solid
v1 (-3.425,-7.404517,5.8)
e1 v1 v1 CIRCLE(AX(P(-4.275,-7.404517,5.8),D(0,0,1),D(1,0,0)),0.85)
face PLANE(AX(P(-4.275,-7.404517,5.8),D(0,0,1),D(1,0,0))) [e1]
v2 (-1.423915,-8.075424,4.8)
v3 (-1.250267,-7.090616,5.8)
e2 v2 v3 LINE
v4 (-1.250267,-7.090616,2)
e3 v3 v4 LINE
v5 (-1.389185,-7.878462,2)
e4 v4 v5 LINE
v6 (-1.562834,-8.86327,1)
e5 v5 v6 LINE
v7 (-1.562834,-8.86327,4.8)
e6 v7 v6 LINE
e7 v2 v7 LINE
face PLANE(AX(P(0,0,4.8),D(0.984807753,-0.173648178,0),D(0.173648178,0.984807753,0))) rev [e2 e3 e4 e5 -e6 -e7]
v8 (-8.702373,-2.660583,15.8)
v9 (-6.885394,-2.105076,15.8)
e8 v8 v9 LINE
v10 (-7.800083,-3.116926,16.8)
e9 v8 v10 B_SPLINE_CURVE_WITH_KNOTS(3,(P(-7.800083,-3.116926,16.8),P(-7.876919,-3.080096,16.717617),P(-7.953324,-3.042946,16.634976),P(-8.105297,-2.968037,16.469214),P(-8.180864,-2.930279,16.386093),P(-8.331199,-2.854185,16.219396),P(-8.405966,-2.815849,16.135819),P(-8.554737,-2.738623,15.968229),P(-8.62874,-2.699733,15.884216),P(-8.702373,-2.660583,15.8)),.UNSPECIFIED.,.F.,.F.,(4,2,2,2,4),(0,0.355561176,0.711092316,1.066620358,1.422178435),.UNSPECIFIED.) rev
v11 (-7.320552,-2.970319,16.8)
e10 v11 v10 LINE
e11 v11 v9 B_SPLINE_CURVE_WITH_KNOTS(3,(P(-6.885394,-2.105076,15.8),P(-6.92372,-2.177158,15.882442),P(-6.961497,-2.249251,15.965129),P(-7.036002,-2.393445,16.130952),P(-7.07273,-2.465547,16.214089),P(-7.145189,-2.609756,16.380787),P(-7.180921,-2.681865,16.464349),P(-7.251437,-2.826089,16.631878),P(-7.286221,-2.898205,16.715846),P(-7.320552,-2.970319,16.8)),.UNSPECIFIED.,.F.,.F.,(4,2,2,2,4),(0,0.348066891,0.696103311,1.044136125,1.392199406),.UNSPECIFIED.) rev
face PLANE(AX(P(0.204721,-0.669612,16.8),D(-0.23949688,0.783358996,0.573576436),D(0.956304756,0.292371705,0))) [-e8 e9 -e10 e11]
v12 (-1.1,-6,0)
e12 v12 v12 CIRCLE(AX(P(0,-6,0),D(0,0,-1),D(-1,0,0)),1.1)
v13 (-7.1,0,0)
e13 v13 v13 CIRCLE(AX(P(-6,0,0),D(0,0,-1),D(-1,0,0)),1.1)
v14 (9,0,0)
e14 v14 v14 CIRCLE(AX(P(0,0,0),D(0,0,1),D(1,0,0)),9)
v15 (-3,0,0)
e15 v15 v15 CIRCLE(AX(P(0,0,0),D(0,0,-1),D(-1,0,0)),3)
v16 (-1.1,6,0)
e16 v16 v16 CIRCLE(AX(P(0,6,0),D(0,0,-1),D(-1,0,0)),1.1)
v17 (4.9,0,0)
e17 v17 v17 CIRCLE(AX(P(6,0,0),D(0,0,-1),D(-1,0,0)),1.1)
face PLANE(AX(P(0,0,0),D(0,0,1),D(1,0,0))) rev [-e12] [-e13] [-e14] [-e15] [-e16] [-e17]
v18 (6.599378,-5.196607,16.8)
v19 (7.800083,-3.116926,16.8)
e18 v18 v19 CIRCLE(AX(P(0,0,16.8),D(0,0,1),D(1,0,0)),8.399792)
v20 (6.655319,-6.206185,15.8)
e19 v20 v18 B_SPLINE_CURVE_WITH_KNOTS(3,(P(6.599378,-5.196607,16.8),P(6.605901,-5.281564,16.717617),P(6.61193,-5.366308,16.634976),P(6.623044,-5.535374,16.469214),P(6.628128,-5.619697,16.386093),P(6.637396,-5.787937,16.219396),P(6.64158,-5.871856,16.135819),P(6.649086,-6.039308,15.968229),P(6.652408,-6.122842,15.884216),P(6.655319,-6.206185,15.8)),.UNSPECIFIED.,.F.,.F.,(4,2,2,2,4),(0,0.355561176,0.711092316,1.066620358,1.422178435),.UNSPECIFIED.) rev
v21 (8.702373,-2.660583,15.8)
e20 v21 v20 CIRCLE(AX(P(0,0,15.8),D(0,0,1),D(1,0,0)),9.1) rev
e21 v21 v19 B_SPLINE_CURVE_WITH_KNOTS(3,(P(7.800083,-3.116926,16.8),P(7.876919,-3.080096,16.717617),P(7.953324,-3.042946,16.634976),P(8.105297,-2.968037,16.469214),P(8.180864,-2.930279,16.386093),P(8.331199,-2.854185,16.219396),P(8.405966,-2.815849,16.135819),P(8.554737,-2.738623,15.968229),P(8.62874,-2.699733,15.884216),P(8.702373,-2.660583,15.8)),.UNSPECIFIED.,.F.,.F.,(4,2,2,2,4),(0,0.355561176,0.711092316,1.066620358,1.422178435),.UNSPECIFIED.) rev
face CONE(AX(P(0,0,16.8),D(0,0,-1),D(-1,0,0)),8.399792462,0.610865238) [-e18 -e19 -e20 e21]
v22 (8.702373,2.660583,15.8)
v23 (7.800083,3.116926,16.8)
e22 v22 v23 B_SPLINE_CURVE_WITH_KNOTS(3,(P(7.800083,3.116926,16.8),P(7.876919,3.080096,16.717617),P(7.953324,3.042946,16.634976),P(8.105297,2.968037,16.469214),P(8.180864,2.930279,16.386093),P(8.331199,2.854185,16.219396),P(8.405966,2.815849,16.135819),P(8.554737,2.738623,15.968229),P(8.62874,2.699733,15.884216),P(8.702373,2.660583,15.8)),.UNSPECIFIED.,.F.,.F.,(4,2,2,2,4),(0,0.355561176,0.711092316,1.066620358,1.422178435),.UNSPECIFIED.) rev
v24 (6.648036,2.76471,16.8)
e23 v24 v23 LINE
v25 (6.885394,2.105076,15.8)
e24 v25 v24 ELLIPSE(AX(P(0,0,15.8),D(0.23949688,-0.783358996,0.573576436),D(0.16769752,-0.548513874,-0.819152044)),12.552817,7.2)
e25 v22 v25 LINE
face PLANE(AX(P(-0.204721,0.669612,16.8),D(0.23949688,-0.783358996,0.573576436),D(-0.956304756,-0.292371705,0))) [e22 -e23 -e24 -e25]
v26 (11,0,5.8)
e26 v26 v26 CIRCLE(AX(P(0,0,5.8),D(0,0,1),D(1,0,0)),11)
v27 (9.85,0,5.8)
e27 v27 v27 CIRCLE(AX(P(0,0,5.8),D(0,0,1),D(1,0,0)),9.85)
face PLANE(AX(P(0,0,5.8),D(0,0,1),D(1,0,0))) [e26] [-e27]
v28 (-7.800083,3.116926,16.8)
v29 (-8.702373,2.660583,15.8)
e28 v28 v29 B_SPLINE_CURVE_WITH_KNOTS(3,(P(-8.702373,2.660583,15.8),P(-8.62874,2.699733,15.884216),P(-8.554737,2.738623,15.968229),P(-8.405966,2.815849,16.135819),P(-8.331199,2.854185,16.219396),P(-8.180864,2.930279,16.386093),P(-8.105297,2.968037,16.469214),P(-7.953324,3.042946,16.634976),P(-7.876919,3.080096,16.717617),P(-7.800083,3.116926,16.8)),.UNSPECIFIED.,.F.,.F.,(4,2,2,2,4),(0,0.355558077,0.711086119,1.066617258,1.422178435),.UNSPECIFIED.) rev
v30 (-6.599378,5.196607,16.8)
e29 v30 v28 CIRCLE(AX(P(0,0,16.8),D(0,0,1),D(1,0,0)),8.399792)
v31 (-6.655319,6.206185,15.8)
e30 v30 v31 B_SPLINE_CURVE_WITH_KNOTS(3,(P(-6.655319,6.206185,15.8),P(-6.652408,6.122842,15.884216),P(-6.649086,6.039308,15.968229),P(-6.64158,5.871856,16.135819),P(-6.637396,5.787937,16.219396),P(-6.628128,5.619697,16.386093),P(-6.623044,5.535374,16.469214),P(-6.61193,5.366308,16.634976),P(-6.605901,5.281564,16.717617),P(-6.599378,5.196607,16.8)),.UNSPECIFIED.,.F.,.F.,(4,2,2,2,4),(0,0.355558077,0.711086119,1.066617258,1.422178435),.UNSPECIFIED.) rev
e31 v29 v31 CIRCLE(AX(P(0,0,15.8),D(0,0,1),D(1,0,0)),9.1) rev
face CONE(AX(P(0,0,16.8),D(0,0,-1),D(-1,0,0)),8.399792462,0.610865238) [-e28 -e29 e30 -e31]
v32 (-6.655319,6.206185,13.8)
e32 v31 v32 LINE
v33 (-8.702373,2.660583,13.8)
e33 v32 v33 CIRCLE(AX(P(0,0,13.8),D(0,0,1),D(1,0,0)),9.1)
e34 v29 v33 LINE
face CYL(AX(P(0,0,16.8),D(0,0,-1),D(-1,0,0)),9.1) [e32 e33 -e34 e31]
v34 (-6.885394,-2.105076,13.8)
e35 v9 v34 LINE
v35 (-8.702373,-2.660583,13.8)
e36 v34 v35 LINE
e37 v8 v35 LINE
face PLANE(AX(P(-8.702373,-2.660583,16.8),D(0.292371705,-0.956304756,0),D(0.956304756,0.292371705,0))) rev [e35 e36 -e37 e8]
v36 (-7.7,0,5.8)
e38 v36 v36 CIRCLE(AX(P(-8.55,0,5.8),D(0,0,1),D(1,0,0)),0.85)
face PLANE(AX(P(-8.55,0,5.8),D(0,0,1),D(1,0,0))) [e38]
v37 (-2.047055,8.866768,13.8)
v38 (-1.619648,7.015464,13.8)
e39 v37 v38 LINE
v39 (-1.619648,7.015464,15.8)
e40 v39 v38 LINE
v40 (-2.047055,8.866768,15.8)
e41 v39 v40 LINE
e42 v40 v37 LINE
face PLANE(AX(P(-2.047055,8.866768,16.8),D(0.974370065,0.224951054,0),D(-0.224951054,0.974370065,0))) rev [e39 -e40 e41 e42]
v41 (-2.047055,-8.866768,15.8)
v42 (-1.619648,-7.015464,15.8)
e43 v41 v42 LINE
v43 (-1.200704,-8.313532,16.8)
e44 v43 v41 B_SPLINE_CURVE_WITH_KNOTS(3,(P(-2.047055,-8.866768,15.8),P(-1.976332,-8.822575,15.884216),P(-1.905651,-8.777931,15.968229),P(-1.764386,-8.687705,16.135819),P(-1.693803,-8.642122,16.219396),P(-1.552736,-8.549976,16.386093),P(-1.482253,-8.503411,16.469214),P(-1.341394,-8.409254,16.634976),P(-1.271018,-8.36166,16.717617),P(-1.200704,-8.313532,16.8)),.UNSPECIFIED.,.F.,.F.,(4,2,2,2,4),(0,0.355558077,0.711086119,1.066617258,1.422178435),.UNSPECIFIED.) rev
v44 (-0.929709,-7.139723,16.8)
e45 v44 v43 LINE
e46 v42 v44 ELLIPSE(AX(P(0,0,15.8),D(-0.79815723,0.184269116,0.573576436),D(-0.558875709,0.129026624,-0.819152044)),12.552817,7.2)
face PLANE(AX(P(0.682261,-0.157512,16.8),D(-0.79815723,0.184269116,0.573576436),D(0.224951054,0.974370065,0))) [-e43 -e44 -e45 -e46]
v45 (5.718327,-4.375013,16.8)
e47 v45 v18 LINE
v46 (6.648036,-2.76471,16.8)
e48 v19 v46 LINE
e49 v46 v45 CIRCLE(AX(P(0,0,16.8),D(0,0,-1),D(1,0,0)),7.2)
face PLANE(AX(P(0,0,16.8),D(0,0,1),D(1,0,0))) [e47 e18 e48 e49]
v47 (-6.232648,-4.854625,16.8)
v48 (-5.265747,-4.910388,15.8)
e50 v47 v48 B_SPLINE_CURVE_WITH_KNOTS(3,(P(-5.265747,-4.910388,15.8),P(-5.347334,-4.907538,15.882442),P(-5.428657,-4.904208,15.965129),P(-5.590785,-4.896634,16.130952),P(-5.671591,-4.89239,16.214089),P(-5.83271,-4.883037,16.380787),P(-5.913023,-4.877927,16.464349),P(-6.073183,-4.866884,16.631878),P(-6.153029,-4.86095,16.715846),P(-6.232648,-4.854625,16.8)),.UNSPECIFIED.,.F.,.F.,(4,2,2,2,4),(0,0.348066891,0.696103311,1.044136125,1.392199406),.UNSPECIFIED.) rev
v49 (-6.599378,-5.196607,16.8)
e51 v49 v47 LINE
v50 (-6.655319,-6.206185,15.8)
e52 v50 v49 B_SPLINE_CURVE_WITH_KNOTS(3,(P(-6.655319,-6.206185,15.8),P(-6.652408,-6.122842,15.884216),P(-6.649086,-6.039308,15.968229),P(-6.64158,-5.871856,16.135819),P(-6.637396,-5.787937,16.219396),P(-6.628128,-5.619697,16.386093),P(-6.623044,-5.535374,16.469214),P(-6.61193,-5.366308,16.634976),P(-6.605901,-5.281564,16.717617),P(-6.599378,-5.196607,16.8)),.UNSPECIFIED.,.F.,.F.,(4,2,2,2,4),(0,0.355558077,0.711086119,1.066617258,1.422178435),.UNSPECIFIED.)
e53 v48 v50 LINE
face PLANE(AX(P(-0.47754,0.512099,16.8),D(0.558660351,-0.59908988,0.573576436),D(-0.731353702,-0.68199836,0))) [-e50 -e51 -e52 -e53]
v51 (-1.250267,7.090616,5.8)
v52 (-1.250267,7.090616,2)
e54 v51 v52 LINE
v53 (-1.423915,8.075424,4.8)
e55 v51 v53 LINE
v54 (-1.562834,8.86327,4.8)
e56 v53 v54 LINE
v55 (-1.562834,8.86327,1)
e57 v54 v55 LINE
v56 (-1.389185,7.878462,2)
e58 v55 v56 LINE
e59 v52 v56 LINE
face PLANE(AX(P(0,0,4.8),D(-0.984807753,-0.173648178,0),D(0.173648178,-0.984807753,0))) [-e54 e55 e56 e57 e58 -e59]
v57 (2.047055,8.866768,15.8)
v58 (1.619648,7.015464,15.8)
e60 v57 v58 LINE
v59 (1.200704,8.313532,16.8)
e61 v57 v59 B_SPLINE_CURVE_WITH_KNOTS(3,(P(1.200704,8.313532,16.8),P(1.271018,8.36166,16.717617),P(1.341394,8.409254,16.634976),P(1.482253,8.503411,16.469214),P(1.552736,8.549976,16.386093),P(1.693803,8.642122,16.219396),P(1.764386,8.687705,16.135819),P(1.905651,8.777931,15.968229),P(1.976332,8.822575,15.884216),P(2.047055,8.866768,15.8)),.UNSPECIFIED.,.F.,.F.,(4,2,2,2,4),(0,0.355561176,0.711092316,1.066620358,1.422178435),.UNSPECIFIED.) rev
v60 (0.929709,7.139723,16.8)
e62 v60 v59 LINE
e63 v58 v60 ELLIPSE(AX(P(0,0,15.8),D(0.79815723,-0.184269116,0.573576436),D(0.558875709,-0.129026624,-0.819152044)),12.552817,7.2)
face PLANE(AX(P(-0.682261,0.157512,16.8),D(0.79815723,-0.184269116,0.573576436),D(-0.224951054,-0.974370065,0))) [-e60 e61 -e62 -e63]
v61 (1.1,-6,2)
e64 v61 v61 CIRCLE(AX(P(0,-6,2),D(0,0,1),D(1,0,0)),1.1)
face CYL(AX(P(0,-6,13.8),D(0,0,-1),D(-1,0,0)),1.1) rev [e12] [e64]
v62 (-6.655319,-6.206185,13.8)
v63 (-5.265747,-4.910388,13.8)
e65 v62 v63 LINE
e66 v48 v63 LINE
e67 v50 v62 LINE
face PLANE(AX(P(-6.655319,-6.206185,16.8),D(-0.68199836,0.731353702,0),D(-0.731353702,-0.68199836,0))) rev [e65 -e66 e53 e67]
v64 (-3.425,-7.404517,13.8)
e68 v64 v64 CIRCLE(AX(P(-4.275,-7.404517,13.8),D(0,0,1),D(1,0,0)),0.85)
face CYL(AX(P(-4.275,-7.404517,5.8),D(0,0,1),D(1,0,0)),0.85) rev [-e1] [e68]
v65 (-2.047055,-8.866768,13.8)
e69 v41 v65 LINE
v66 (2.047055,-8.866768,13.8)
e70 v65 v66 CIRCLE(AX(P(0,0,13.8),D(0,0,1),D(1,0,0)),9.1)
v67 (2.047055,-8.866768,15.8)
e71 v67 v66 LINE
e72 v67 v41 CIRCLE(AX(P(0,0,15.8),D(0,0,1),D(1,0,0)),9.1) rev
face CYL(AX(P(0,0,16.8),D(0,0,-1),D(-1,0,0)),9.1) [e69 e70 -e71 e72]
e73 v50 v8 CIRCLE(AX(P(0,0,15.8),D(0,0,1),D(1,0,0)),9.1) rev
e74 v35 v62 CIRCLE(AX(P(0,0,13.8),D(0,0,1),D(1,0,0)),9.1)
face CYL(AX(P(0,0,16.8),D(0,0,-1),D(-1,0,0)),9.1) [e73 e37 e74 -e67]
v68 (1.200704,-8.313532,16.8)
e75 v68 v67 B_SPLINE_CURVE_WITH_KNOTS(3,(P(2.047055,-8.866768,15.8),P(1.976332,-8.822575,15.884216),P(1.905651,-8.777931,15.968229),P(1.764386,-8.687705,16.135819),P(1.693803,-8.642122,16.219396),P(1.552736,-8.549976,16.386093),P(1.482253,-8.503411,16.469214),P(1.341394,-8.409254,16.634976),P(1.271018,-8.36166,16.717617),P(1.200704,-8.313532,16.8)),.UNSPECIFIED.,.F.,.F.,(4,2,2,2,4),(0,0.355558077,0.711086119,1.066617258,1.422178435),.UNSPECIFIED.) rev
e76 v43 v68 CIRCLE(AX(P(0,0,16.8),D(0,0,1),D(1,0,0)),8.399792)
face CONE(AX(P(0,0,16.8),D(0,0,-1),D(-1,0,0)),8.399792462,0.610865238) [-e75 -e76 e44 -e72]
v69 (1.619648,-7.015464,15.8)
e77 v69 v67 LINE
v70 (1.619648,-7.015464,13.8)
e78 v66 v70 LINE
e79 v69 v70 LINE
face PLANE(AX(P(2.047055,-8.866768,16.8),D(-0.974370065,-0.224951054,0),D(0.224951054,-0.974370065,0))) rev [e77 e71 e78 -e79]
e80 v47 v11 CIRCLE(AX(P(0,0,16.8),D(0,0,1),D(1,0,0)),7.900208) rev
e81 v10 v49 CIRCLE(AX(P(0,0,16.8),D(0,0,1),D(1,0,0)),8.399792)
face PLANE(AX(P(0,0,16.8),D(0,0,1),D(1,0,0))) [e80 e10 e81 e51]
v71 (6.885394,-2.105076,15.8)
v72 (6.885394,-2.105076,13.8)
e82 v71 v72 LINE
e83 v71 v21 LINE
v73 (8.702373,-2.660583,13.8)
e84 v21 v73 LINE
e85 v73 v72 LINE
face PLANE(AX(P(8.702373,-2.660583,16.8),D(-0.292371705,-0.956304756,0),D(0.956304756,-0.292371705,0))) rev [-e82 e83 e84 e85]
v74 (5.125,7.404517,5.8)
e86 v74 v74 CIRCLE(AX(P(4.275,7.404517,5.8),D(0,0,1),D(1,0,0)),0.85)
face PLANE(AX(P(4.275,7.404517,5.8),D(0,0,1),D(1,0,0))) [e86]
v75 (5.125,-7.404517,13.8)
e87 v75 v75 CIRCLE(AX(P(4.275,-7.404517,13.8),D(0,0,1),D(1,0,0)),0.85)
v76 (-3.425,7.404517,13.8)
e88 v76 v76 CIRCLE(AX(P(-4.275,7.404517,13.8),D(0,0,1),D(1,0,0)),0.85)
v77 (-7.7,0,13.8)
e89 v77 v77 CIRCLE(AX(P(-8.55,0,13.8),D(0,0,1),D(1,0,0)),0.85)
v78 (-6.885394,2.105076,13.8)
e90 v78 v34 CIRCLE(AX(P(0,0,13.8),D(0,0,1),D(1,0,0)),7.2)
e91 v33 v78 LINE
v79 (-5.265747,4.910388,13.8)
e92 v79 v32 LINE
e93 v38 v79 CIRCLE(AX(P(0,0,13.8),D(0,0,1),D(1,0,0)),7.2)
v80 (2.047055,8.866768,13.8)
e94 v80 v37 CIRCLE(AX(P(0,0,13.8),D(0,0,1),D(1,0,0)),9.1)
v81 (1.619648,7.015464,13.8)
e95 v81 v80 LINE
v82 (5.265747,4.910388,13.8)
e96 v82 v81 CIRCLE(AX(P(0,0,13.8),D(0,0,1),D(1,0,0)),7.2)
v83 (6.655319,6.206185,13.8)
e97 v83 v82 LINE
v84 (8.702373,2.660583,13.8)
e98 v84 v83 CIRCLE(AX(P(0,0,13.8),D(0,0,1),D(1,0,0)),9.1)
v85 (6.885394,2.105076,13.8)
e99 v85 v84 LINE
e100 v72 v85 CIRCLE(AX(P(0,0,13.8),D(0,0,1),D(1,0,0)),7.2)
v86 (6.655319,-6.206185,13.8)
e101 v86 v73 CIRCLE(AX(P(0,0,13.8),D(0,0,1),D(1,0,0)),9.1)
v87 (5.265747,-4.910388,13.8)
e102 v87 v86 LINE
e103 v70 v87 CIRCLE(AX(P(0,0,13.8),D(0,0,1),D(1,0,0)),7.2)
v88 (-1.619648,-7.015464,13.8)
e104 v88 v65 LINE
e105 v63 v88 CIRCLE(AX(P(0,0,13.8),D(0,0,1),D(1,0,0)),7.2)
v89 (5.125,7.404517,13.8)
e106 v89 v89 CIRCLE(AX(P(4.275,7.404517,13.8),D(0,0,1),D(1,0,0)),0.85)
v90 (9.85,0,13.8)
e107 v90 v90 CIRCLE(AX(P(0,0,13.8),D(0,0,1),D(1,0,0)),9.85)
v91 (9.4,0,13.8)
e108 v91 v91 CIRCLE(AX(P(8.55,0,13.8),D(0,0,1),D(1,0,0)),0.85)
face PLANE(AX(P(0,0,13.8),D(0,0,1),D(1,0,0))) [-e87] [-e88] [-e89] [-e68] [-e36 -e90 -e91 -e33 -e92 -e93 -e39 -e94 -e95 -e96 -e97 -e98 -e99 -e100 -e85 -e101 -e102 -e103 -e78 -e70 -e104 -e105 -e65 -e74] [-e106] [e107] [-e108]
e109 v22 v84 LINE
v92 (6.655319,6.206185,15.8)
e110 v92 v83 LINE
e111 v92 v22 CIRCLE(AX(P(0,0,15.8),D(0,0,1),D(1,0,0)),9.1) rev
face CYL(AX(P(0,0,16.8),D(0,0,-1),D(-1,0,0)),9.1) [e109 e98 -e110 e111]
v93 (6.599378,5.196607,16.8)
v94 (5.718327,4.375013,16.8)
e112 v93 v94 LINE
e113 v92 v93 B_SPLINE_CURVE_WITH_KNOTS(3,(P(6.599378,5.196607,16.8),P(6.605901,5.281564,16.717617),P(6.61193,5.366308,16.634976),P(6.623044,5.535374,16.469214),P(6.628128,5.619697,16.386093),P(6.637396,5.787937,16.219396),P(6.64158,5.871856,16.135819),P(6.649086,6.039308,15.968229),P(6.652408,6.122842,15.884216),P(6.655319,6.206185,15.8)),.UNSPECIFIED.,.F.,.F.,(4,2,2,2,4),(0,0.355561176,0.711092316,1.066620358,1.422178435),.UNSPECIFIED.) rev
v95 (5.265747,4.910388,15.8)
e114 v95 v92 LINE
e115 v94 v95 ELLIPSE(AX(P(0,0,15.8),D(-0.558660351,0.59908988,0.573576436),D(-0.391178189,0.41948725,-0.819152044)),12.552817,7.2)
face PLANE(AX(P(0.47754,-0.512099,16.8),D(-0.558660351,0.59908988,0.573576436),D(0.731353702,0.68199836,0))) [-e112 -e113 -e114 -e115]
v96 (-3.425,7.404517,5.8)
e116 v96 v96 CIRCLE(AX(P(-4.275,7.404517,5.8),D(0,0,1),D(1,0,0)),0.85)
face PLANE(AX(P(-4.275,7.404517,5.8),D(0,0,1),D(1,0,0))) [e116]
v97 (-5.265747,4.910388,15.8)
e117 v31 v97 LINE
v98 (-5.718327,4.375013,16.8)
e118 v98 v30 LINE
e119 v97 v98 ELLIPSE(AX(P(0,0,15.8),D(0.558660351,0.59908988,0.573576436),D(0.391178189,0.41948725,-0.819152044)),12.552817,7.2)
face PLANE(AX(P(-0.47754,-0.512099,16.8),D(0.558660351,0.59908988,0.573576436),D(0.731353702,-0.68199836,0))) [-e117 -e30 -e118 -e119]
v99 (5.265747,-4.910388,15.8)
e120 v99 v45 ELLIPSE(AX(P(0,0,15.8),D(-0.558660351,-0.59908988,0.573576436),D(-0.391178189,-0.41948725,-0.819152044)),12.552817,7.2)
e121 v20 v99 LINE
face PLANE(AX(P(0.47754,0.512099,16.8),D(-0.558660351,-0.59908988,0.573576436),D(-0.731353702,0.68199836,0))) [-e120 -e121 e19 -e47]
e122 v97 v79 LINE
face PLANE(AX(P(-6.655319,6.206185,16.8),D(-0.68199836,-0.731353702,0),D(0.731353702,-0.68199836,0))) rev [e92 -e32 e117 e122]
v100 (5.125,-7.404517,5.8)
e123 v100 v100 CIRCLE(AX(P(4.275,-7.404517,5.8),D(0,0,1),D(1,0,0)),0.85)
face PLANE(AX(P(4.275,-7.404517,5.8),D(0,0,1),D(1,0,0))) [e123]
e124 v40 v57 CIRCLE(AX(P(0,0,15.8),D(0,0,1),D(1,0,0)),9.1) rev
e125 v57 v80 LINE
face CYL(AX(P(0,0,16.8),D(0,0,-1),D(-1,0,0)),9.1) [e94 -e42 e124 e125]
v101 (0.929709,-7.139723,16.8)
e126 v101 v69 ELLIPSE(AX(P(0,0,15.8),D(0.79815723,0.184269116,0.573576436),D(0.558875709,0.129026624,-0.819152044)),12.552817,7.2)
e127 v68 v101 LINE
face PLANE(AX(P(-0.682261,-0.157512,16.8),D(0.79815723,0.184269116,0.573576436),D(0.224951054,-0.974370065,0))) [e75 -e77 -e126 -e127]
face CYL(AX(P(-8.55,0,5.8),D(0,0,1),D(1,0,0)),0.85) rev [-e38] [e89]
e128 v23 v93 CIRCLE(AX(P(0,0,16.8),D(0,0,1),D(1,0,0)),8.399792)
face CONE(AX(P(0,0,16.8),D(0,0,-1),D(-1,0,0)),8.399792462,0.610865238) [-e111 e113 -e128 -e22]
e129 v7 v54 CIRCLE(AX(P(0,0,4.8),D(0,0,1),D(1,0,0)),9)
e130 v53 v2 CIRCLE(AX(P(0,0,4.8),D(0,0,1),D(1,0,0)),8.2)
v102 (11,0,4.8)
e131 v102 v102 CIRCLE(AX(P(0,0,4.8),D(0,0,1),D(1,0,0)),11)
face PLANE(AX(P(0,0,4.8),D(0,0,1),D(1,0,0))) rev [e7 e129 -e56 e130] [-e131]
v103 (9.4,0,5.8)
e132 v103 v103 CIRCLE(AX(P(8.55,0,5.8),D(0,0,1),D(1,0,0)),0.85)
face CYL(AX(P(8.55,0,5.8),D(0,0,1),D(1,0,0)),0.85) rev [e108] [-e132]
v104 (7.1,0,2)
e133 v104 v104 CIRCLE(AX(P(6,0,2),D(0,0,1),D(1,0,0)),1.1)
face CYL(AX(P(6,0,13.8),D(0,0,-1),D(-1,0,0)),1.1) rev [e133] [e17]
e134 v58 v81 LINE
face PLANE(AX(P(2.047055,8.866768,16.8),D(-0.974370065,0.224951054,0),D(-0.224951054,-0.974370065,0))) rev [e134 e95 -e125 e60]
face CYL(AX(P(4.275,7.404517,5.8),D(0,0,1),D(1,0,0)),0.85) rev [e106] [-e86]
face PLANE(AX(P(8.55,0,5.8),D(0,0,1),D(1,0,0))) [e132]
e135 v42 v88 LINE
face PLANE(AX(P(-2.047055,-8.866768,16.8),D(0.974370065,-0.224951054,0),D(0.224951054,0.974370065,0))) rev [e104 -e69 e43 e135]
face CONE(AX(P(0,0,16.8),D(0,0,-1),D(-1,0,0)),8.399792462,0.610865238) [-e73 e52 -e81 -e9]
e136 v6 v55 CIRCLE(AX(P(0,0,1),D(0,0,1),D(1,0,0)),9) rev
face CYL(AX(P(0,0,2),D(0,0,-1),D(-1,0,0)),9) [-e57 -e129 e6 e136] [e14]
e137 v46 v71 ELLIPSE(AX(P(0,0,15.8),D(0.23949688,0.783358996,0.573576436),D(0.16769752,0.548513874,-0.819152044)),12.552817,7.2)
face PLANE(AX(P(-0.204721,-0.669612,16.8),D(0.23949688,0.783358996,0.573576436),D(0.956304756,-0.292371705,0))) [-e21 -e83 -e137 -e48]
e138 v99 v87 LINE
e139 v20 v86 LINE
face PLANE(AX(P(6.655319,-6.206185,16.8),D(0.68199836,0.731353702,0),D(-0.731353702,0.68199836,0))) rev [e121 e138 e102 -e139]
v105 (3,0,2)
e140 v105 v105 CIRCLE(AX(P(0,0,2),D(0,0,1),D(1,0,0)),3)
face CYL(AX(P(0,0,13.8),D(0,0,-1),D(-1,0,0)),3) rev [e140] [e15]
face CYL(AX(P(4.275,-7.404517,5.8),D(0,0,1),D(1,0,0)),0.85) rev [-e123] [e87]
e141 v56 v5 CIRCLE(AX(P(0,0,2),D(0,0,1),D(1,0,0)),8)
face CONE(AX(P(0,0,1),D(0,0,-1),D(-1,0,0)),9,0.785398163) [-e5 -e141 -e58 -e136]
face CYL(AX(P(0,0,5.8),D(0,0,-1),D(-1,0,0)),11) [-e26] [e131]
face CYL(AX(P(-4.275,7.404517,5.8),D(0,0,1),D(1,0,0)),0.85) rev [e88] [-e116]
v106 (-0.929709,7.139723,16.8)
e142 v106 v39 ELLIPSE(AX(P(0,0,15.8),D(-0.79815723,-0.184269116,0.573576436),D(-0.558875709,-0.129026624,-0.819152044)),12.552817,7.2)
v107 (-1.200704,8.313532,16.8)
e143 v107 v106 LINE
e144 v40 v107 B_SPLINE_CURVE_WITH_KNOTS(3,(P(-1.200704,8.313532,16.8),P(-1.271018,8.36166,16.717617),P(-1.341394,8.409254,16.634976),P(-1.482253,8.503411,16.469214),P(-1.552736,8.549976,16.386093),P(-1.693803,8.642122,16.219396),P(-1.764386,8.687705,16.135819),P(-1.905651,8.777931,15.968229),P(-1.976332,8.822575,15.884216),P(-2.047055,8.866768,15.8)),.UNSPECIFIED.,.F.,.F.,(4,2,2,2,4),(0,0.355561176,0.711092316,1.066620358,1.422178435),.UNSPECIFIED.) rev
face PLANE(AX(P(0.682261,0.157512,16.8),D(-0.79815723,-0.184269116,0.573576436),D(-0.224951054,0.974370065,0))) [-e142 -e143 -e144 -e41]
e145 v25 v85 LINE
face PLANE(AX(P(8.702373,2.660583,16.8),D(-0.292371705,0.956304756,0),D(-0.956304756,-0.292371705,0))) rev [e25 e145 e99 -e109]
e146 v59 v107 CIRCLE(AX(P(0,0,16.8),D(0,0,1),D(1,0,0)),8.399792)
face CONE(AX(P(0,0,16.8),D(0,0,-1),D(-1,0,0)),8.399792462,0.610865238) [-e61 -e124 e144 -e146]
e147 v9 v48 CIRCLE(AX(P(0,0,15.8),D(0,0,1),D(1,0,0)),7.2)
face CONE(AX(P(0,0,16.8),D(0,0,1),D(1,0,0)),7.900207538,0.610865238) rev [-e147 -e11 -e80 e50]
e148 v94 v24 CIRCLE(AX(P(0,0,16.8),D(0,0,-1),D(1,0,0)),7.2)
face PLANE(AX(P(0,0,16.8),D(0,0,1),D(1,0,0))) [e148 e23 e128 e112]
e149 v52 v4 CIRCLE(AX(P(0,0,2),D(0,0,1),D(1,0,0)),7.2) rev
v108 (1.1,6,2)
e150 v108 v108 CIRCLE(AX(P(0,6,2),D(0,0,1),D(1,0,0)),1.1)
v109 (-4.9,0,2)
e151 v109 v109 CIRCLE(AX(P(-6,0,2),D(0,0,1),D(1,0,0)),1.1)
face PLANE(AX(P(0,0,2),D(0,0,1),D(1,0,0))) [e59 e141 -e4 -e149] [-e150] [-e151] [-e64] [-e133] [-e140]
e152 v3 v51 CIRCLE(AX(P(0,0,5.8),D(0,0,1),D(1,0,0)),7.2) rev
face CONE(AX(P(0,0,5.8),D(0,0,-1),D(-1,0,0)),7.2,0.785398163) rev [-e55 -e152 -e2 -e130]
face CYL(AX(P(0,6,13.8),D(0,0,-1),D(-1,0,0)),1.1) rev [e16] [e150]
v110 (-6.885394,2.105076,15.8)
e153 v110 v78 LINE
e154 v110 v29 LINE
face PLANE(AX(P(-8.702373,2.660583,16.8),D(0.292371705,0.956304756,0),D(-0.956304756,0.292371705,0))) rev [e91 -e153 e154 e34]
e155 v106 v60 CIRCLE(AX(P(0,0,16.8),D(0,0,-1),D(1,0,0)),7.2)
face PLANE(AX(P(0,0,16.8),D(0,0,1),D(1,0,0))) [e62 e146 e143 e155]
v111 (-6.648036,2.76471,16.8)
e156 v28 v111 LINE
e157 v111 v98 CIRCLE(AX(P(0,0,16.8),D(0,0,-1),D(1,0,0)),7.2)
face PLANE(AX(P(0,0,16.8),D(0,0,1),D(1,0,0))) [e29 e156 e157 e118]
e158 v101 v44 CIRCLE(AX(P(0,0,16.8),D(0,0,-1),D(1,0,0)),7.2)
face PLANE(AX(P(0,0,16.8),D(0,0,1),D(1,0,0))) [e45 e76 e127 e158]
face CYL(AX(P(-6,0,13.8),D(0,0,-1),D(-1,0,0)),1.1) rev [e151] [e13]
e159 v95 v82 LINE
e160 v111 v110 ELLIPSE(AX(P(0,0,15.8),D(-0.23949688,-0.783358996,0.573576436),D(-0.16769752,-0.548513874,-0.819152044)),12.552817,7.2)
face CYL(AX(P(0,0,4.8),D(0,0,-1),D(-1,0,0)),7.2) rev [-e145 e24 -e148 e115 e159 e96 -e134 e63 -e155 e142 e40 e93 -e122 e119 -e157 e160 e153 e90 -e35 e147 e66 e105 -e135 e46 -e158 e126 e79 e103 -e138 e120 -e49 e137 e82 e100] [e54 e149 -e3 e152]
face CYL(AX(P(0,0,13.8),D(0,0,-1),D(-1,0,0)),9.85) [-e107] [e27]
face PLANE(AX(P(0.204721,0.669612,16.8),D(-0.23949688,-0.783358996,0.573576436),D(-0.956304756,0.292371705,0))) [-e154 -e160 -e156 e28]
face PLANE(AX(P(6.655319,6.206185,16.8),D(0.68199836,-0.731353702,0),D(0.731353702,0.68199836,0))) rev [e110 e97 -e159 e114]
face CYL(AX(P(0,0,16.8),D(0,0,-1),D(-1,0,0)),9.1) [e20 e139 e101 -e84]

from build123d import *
from OCP.BRepFilletAPI import BRepFilletAPI_MakeChamfer
from build123d.topology import SkipClean

# Parameters (mm, degrees)
SKETCH_1_R          = 9
EXTRUDE_1_DEPTH     = 2
SKETCH_2_R          = 9
SKETCH_2_R_2        = 7.2
EXTRUDE_2_DEPTH     = 2.8
SKETCH_4_R          = 11
SKETCH_4_R_2        = 7.2
EXTRUDE_3_DEPTH     = 1
SKETCH_5_R          = 9.85
SKETCH_5_R_2        = 7.2
EXTRUDE_4_DEPTH     = 8
SKETCH_6_R          = 0.85
CUT_EXTRUDE_1_DEPTH = 8
SKETCH_7_R          = 3
SKETCH_7_R_2        = 1.1
CUT_EXTRUDE_2_DEPTH = 21.795191752
EXTRUDE_5_DEPTH     = 3
CHAMFER_1_SIZE      = 1
CHAMFER_1_SIZE2     = 0.700207538
CUT_EXTRUDE_START   = -2
SKETCH_11_R         = 1.1
CUT_EXTRUDE_3_DEPTH = 2.8
CHAMFER_2_SIZE      = 1


with BuildPart() as part:
    # 스케치1 → 보스-돌출1 (new body)
    with BuildSketch(Plane.XY):
        Circle(SKETCH_1_R)
    extrude(amount=EXTRUDE_1_DEPTH)

    # 스케치2 → 보스-돌출2 (add)
    with BuildSketch(Plane.XY.offset(2)):
        Circle(SKETCH_2_R)
        Circle(SKETCH_2_R_2, mode=Mode.SUBTRACT)
    extrude(amount=EXTRUDE_2_DEPTH)

    # 스케치4 → 보스-돌출3 (add)
    with BuildSketch(Plane.XY.offset(4.8)):
        Circle(SKETCH_4_R)
        Circle(SKETCH_4_R_2, mode=Mode.SUBTRACT)
    extrude(amount=EXTRUDE_3_DEPTH)

    # 스케치5 → 보스-돌출4 (add)
    with BuildSketch(Plane.XY.offset(5.8)):
        Circle(SKETCH_5_R)
        Circle(SKETCH_5_R_2, mode=Mode.SUBTRACT)
    extrude(amount=EXTRUDE_4_DEPTH)

    # 스케치6 → 컷-돌출1 (cut)
    with BuildSketch(Plane.XY.offset(13.8)):
        with Locations((8.55, 0)):
            Circle(SKETCH_6_R)
        with Locations((4.275, -7.404517202)):
            Circle(SKETCH_6_R)
        with Locations((-4.275, -7.404517202)):
            Circle(SKETCH_6_R)
        with Locations((-8.55, 0)):
            Circle(SKETCH_6_R)
        with Locations((-4.275, 7.404517202)):
            Circle(SKETCH_6_R)
        with Locations((4.275, 7.404517202)):
            Circle(SKETCH_6_R)
    extrude(amount=-CUT_EXTRUDE_1_DEPTH, mode=Mode.SUBTRACT)

    # 스케치7 → 컷-돌출2 (cut, through all)
    with BuildSketch(Plane(origin=(0, 0, 0), x_dir=(-1, 0, 0), z_dir=(0, 0, -1))):
        Circle(SKETCH_7_R)
        with Locations((-6, 0)):
            Circle(SKETCH_7_R_2)
        with Locations((6, 0)):
            Circle(SKETCH_7_R_2)
        with Locations((0, 6)):
            Circle(SKETCH_7_R_2)
        with Locations((0, -6)):
            Circle(SKETCH_7_R_2)
    extrude(amount=-CUT_EXTRUDE_2_DEPTH, mode=Mode.SUBTRACT)

    # 스케치10 → 보스-돌출5 (add)
    with SkipClean():  # the faces are left unmerged after this step: merging them gives an invalid solid
        with BuildSketch(Plane.XY.offset(13.8)):
            with BuildLine():
                Line((2.047054595, 8.86676759), (1.619647591, 7.015464466))
                ThreePointArc((1.619647591, 7.015464466), (0, 7.2), (-1.619647591, 7.015464466))
                Line((-1.619647591, 7.015464466), (-2.047054595, 8.86676759))
                ThreePointArc((-2.047054595, 8.86676759), (0, 9.1), (2.047054595, 8.86676759))
            make_face()
            with BuildLine():
                Line((6.655318685, 6.206185077), (5.265746652, 4.910388192))
                ThreePointArc((5.265746652, 4.910388192), (6.235382907, 3.6), (6.885394243, 2.105076274))
                Line((6.885394243, 2.105076274), (8.702373279, 2.660582513))
                ThreePointArc((8.702373279, 2.660582513), (7.880831174, 4.55), (6.655318685, 6.206185077))
            make_face()
            with BuildLine():
                Line((8.702373279, -2.660582513), (6.885394243, -2.105076274))
                ThreePointArc((6.885394243, -2.105076274), (6.235382907, -3.6), (5.265746652, -4.910388192))
                Line((5.265746652, -4.910388192), (6.655318685, -6.206185077))
                ThreePointArc((6.655318685, -6.206185077), (7.880831174, -4.55), (8.702373279, -2.660582513))
            make_face()
            with BuildLine():
                Line((2.047054595, -8.86676759), (1.619647591, -7.015464466))
                ThreePointArc((1.619647591, -7.015464466), (0, -7.2), (-1.619647591, -7.015464466))
                Line((-1.619647591, -7.015464466), (-2.047054595, -8.86676759))
                ThreePointArc((-2.047054595, -8.86676759), (0, -9.1), (2.047054595, -8.86676759))
            make_face()
            with BuildLine():
                Line((-6.655318685, -6.206185077), (-5.265746652, -4.910388192))
                ThreePointArc((-5.265746652, -4.910388192), (-6.235382907, -3.6), (-6.885394243, -2.105076274))
                Line((-6.885394243, -2.105076274), (-8.702373279, -2.660582513))
                ThreePointArc((-8.702373279, -2.660582513), (-7.880831174, -4.55), (-6.655318685, -6.206185077))
            make_face()
            with BuildLine():
                Line((-8.702373279, 2.660582513), (-6.885394243, 2.105076274))
                ThreePointArc((-6.885394243, 2.105076274), (-6.235382907, 3.6), (-5.265746652, 4.910388192))
                Line((-5.265746652, 4.910388192), (-6.655318685, 6.206185077))
                ThreePointArc((-6.655318685, 6.206185077), (-7.880831174, 4.55), (-8.702373279, 2.660582513))
            make_face()
        extrude(amount=EXTRUDE_5_DEPTH)

    # 모따기1: one chamfer whose edges measure the first distance from different faces: ONE call of the kernel's chamfer builder (chamfer() names one face for all edges)
    chamfer_1_edges_1 = [part.edges().sort_by_distance(p)[0] for p in [
        (-7.880831174, -4.55, 16.8),
    ]]
    chamfer_1_side_1 = [part.faces().sort_by_distance(p)[0] for p in [
        (-7.880831174, -4.55, 15.3),
    ]]
    chamfer_1_edges_2 = [part.edges().sort_by_distance(p)[0] for p in [
        (0, -9.1, 16.8),
    ]]
    chamfer_1_side_2 = [part.faces().sort_by_distance(p)[0] for p in [
        (0, -9.1, 15.3),
    ]]
    chamfer_1_edges_3 = [part.edges().sort_by_distance(p)[0] for p in [
        (7.880831174, -4.55, 16.8),
    ]]
    chamfer_1_side_3 = [part.faces().sort_by_distance(p)[0] for p in [
        (7.880831174, -4.55, 15.3),
    ]]
    chamfer_1_edges_4 = [part.edges().sort_by_distance(p)[0] for p in [
        (7.880831174, 4.55, 16.8),
    ]]
    chamfer_1_side_4 = [part.faces().sort_by_distance(p)[0] for p in [
        (7.880831174, 4.55, 15.3),
    ]]
    chamfer_1_edges_5 = [part.edges().sort_by_distance(p)[0] for p in [
        (0, 9.1, 16.8),
    ]]
    chamfer_1_side_5 = [part.faces().sort_by_distance(p)[0] for p in [
        (0, 9.1, 15.3),
    ]]
    chamfer_1_edges_6 = [part.edges().sort_by_distance(p)[0] for p in [
        (-7.880831174, 4.55, 16.8),
    ]]
    chamfer_1_side_6 = [part.faces().sort_by_distance(p)[0] for p in [
        (-7.880831174, 4.55, 15.3),
    ]]
    chamfer_1_edges_7 = [part.edges().sort_by_distance(p)[0] for p in [
        (-7.793883761, -2.382829393, 16.8),
    ]]
    chamfer_1_side_7 = [part.faces().sort_by_distance(p)[0] for p in [
        (-7.793883761, -2.382829393, 15.3),
    ]]
    chamfer_1_edges_8 = [part.edges().sort_by_distance(p)[0] for p in [
        (-6.235382907, -3.6, 16.8),
    ]]
    chamfer_1_side_8 = [part.faces().sort_by_distance(p)[0] for p in [
        (-6.235382907, -3.6, 15.3),
    ]]
    chamfer_1_edges_9 = [part.edges().sort_by_distance(p)[0] for p in [
        (-5.960532668, -5.558286635, 16.8),
    ]]
    chamfer_1_side_9 = [part.faces().sort_by_distance(p)[0] for p in [
        (-5.960532668, -5.558286635, 15.3),
    ]]
    chamfer_1_edges_10 = [part.edges().sort_by_distance(p)[0] for p in [
        (1.833351093, -7.941116028, 16.8),
    ]]
    chamfer_1_side_10 = [part.faces().sort_by_distance(p)[0] for p in [
        (1.833351093, -7.941116028, 15.3),
    ]]
    chamfer_1_edges_11 = [part.edges().sort_by_distance(p)[0] for p in [
        (-1.833351093, -7.941116028, 16.8),
    ]]
    chamfer_1_side_11 = [part.faces().sort_by_distance(p)[0] for p in [
        (-1.833351093, -7.941116028, 15.3),
    ]]
    chamfer_1_edges_12 = [part.edges().sort_by_distance(p)[0] for p in [
        (5.960532668, -5.558286635, 16.8),
    ]]
    chamfer_1_side_12 = [part.faces().sort_by_distance(p)[0] for p in [
        (5.960532668, -5.558286635, 15.3),
    ]]
    chamfer_1_edges_13 = [part.edges().sort_by_distance(p)[0] for p in [
        (7.793883761, -2.382829393, 16.8),
    ]]
    chamfer_1_side_13 = [part.faces().sort_by_distance(p)[0] for p in [
        (7.793883761, -2.382829393, 15.3),
    ]]
    chamfer_1_edges_14 = [part.edges().sort_by_distance(p)[0] for p in [
        (7.793883761, 2.382829393, 16.8),
    ]]
    chamfer_1_side_14 = [part.faces().sort_by_distance(p)[0] for p in [
        (7.793883761, 2.382829393, 15.3),
    ]]
    chamfer_1_edges_15 = [part.edges().sort_by_distance(p)[0] for p in [
        (5.960532668, 5.558286635, 16.8),
    ]]
    chamfer_1_side_15 = [part.faces().sort_by_distance(p)[0] for p in [
        (5.960532668, 5.558286635, 15.3),
    ]]
    chamfer_1_edges_16 = [part.edges().sort_by_distance(p)[0] for p in [
        (1.833351093, 7.941116028, 16.8),
    ]]
    chamfer_1_side_16 = [part.faces().sort_by_distance(p)[0] for p in [
        (1.833351093, 7.941116028, 15.3),
    ]]
    chamfer_1_edges_17 = [part.edges().sort_by_distance(p)[0] for p in [
        (-1.833351093, 7.941116028, 16.8),
    ]]
    chamfer_1_side_17 = [part.faces().sort_by_distance(p)[0] for p in [
        (-1.833351093, 7.941116028, 15.3),
    ]]
    chamfer_1_edges_18 = [part.edges().sort_by_distance(p)[0] for p in [
        (-7.793883761, 2.382829393, 16.8),
    ]]
    chamfer_1_side_18 = [part.faces().sort_by_distance(p)[0] for p in [
        (-7.793883761, 2.382829393, 15.3),
    ]]
    chamfer_1_edges_19 = [part.edges().sort_by_distance(p)[0] for p in [
        (-5.960532668, 5.558286635, 16.8),
    ]]
    chamfer_1_side_19 = [part.faces().sort_by_distance(p)[0] for p in [
        (-5.960532668, 5.558286635, 15.3),
    ]]
    chamfer_1 = BRepFilletAPI_MakeChamfer(part.part.solid().wrapped)
    for e in chamfer_1_edges_1:
        chamfer_1.Add(CHAMFER_1_SIZE, CHAMFER_1_SIZE2, e.wrapped, chamfer_1_side_1[0].wrapped)  # the first distance lies on this face
    for e in chamfer_1_edges_2:
        chamfer_1.Add(CHAMFER_1_SIZE, CHAMFER_1_SIZE2, e.wrapped, chamfer_1_side_2[0].wrapped)  # the first distance lies on this face
    for e in chamfer_1_edges_3:
        chamfer_1.Add(CHAMFER_1_SIZE, CHAMFER_1_SIZE2, e.wrapped, chamfer_1_side_3[0].wrapped)  # the first distance lies on this face
    for e in chamfer_1_edges_4:
        chamfer_1.Add(CHAMFER_1_SIZE, CHAMFER_1_SIZE2, e.wrapped, chamfer_1_side_4[0].wrapped)  # the first distance lies on this face
    for e in chamfer_1_edges_5:
        chamfer_1.Add(CHAMFER_1_SIZE, CHAMFER_1_SIZE2, e.wrapped, chamfer_1_side_5[0].wrapped)  # the first distance lies on this face
    for e in chamfer_1_edges_6:
        chamfer_1.Add(CHAMFER_1_SIZE, CHAMFER_1_SIZE2, e.wrapped, chamfer_1_side_6[0].wrapped)  # the first distance lies on this face
    for e in chamfer_1_edges_7:
        chamfer_1.Add(CHAMFER_1_SIZE, CHAMFER_1_SIZE2, e.wrapped, chamfer_1_side_7[0].wrapped)  # the first distance lies on this face
    for e in chamfer_1_edges_8:
        chamfer_1.Add(CHAMFER_1_SIZE, CHAMFER_1_SIZE2, e.wrapped, chamfer_1_side_8[0].wrapped)  # the first distance lies on this face
    for e in chamfer_1_edges_9:
        chamfer_1.Add(CHAMFER_1_SIZE, CHAMFER_1_SIZE2, e.wrapped, chamfer_1_side_9[0].wrapped)  # the first distance lies on this face
    for e in chamfer_1_edges_10:
        chamfer_1.Add(CHAMFER_1_SIZE, CHAMFER_1_SIZE2, e.wrapped, chamfer_1_side_10[0].wrapped)  # the first distance lies on this face
    for e in chamfer_1_edges_11:
        chamfer_1.Add(CHAMFER_1_SIZE, CHAMFER_1_SIZE2, e.wrapped, chamfer_1_side_11[0].wrapped)  # the first distance lies on this face
    for e in chamfer_1_edges_12:
        chamfer_1.Add(CHAMFER_1_SIZE, CHAMFER_1_SIZE2, e.wrapped, chamfer_1_side_12[0].wrapped)  # the first distance lies on this face
    for e in chamfer_1_edges_13:
        chamfer_1.Add(CHAMFER_1_SIZE, CHAMFER_1_SIZE2, e.wrapped, chamfer_1_side_13[0].wrapped)  # the first distance lies on this face
    for e in chamfer_1_edges_14:
        chamfer_1.Add(CHAMFER_1_SIZE, CHAMFER_1_SIZE2, e.wrapped, chamfer_1_side_14[0].wrapped)  # the first distance lies on this face
    for e in chamfer_1_edges_15:
        chamfer_1.Add(CHAMFER_1_SIZE, CHAMFER_1_SIZE2, e.wrapped, chamfer_1_side_15[0].wrapped)  # the first distance lies on this face
    for e in chamfer_1_edges_16:
        chamfer_1.Add(CHAMFER_1_SIZE, CHAMFER_1_SIZE2, e.wrapped, chamfer_1_side_16[0].wrapped)  # the first distance lies on this face
    for e in chamfer_1_edges_17:
        chamfer_1.Add(CHAMFER_1_SIZE, CHAMFER_1_SIZE2, e.wrapped, chamfer_1_side_17[0].wrapped)  # the first distance lies on this face
    for e in chamfer_1_edges_18:
        chamfer_1.Add(CHAMFER_1_SIZE, CHAMFER_1_SIZE2, e.wrapped, chamfer_1_side_18[0].wrapped)  # the first distance lies on this face
    for e in chamfer_1_edges_19:
        chamfer_1.Add(CHAMFER_1_SIZE, CHAMFER_1_SIZE2, e.wrapped, chamfer_1_side_19[0].wrapped)  # the first distance lies on this face
    add(Compound.cast(chamfer_1.Shape()), mode=Mode.REPLACE)

    # 스케치11 → 컷-돌출3 (cut)
    with BuildSketch(Plane(origin=(0, 0, 0), x_dir=(-1, 0, 0), z_dir=(0, 0, -1)).offset(CUT_EXTRUDE_START)):
        with BuildLine():
            Line((1.562833599, 8.863269777), (0.520944533, 2.954423259))
            ThreePointArc((0.520944533, 2.954423259), (3, 0), (0.520944533, -2.954423259))
            Line((0.520944533, -2.954423259), (1.562833599, -8.863269777))
            ThreePointArc((1.562833599, -8.863269777), (9, 0), (1.562833599, 8.863269777))
        make_face()
        with Locations((6, 0)):
            Circle(SKETCH_11_R, mode=Mode.SUBTRACT)
    extrude(amount=-CUT_EXTRUDE_3_DEPTH, mode=Mode.SUBTRACT)

    # 모따기2
    chamfer_2_edges = [part.edges().sort_by_distance(p)[0] for p in [
        (-7.2, 0, 4.8),
        (-9, 0, 2),
    ]]
    chamfer(chamfer_2_edges, length=CHAMFER_2_SIZE)


solid = part.part
